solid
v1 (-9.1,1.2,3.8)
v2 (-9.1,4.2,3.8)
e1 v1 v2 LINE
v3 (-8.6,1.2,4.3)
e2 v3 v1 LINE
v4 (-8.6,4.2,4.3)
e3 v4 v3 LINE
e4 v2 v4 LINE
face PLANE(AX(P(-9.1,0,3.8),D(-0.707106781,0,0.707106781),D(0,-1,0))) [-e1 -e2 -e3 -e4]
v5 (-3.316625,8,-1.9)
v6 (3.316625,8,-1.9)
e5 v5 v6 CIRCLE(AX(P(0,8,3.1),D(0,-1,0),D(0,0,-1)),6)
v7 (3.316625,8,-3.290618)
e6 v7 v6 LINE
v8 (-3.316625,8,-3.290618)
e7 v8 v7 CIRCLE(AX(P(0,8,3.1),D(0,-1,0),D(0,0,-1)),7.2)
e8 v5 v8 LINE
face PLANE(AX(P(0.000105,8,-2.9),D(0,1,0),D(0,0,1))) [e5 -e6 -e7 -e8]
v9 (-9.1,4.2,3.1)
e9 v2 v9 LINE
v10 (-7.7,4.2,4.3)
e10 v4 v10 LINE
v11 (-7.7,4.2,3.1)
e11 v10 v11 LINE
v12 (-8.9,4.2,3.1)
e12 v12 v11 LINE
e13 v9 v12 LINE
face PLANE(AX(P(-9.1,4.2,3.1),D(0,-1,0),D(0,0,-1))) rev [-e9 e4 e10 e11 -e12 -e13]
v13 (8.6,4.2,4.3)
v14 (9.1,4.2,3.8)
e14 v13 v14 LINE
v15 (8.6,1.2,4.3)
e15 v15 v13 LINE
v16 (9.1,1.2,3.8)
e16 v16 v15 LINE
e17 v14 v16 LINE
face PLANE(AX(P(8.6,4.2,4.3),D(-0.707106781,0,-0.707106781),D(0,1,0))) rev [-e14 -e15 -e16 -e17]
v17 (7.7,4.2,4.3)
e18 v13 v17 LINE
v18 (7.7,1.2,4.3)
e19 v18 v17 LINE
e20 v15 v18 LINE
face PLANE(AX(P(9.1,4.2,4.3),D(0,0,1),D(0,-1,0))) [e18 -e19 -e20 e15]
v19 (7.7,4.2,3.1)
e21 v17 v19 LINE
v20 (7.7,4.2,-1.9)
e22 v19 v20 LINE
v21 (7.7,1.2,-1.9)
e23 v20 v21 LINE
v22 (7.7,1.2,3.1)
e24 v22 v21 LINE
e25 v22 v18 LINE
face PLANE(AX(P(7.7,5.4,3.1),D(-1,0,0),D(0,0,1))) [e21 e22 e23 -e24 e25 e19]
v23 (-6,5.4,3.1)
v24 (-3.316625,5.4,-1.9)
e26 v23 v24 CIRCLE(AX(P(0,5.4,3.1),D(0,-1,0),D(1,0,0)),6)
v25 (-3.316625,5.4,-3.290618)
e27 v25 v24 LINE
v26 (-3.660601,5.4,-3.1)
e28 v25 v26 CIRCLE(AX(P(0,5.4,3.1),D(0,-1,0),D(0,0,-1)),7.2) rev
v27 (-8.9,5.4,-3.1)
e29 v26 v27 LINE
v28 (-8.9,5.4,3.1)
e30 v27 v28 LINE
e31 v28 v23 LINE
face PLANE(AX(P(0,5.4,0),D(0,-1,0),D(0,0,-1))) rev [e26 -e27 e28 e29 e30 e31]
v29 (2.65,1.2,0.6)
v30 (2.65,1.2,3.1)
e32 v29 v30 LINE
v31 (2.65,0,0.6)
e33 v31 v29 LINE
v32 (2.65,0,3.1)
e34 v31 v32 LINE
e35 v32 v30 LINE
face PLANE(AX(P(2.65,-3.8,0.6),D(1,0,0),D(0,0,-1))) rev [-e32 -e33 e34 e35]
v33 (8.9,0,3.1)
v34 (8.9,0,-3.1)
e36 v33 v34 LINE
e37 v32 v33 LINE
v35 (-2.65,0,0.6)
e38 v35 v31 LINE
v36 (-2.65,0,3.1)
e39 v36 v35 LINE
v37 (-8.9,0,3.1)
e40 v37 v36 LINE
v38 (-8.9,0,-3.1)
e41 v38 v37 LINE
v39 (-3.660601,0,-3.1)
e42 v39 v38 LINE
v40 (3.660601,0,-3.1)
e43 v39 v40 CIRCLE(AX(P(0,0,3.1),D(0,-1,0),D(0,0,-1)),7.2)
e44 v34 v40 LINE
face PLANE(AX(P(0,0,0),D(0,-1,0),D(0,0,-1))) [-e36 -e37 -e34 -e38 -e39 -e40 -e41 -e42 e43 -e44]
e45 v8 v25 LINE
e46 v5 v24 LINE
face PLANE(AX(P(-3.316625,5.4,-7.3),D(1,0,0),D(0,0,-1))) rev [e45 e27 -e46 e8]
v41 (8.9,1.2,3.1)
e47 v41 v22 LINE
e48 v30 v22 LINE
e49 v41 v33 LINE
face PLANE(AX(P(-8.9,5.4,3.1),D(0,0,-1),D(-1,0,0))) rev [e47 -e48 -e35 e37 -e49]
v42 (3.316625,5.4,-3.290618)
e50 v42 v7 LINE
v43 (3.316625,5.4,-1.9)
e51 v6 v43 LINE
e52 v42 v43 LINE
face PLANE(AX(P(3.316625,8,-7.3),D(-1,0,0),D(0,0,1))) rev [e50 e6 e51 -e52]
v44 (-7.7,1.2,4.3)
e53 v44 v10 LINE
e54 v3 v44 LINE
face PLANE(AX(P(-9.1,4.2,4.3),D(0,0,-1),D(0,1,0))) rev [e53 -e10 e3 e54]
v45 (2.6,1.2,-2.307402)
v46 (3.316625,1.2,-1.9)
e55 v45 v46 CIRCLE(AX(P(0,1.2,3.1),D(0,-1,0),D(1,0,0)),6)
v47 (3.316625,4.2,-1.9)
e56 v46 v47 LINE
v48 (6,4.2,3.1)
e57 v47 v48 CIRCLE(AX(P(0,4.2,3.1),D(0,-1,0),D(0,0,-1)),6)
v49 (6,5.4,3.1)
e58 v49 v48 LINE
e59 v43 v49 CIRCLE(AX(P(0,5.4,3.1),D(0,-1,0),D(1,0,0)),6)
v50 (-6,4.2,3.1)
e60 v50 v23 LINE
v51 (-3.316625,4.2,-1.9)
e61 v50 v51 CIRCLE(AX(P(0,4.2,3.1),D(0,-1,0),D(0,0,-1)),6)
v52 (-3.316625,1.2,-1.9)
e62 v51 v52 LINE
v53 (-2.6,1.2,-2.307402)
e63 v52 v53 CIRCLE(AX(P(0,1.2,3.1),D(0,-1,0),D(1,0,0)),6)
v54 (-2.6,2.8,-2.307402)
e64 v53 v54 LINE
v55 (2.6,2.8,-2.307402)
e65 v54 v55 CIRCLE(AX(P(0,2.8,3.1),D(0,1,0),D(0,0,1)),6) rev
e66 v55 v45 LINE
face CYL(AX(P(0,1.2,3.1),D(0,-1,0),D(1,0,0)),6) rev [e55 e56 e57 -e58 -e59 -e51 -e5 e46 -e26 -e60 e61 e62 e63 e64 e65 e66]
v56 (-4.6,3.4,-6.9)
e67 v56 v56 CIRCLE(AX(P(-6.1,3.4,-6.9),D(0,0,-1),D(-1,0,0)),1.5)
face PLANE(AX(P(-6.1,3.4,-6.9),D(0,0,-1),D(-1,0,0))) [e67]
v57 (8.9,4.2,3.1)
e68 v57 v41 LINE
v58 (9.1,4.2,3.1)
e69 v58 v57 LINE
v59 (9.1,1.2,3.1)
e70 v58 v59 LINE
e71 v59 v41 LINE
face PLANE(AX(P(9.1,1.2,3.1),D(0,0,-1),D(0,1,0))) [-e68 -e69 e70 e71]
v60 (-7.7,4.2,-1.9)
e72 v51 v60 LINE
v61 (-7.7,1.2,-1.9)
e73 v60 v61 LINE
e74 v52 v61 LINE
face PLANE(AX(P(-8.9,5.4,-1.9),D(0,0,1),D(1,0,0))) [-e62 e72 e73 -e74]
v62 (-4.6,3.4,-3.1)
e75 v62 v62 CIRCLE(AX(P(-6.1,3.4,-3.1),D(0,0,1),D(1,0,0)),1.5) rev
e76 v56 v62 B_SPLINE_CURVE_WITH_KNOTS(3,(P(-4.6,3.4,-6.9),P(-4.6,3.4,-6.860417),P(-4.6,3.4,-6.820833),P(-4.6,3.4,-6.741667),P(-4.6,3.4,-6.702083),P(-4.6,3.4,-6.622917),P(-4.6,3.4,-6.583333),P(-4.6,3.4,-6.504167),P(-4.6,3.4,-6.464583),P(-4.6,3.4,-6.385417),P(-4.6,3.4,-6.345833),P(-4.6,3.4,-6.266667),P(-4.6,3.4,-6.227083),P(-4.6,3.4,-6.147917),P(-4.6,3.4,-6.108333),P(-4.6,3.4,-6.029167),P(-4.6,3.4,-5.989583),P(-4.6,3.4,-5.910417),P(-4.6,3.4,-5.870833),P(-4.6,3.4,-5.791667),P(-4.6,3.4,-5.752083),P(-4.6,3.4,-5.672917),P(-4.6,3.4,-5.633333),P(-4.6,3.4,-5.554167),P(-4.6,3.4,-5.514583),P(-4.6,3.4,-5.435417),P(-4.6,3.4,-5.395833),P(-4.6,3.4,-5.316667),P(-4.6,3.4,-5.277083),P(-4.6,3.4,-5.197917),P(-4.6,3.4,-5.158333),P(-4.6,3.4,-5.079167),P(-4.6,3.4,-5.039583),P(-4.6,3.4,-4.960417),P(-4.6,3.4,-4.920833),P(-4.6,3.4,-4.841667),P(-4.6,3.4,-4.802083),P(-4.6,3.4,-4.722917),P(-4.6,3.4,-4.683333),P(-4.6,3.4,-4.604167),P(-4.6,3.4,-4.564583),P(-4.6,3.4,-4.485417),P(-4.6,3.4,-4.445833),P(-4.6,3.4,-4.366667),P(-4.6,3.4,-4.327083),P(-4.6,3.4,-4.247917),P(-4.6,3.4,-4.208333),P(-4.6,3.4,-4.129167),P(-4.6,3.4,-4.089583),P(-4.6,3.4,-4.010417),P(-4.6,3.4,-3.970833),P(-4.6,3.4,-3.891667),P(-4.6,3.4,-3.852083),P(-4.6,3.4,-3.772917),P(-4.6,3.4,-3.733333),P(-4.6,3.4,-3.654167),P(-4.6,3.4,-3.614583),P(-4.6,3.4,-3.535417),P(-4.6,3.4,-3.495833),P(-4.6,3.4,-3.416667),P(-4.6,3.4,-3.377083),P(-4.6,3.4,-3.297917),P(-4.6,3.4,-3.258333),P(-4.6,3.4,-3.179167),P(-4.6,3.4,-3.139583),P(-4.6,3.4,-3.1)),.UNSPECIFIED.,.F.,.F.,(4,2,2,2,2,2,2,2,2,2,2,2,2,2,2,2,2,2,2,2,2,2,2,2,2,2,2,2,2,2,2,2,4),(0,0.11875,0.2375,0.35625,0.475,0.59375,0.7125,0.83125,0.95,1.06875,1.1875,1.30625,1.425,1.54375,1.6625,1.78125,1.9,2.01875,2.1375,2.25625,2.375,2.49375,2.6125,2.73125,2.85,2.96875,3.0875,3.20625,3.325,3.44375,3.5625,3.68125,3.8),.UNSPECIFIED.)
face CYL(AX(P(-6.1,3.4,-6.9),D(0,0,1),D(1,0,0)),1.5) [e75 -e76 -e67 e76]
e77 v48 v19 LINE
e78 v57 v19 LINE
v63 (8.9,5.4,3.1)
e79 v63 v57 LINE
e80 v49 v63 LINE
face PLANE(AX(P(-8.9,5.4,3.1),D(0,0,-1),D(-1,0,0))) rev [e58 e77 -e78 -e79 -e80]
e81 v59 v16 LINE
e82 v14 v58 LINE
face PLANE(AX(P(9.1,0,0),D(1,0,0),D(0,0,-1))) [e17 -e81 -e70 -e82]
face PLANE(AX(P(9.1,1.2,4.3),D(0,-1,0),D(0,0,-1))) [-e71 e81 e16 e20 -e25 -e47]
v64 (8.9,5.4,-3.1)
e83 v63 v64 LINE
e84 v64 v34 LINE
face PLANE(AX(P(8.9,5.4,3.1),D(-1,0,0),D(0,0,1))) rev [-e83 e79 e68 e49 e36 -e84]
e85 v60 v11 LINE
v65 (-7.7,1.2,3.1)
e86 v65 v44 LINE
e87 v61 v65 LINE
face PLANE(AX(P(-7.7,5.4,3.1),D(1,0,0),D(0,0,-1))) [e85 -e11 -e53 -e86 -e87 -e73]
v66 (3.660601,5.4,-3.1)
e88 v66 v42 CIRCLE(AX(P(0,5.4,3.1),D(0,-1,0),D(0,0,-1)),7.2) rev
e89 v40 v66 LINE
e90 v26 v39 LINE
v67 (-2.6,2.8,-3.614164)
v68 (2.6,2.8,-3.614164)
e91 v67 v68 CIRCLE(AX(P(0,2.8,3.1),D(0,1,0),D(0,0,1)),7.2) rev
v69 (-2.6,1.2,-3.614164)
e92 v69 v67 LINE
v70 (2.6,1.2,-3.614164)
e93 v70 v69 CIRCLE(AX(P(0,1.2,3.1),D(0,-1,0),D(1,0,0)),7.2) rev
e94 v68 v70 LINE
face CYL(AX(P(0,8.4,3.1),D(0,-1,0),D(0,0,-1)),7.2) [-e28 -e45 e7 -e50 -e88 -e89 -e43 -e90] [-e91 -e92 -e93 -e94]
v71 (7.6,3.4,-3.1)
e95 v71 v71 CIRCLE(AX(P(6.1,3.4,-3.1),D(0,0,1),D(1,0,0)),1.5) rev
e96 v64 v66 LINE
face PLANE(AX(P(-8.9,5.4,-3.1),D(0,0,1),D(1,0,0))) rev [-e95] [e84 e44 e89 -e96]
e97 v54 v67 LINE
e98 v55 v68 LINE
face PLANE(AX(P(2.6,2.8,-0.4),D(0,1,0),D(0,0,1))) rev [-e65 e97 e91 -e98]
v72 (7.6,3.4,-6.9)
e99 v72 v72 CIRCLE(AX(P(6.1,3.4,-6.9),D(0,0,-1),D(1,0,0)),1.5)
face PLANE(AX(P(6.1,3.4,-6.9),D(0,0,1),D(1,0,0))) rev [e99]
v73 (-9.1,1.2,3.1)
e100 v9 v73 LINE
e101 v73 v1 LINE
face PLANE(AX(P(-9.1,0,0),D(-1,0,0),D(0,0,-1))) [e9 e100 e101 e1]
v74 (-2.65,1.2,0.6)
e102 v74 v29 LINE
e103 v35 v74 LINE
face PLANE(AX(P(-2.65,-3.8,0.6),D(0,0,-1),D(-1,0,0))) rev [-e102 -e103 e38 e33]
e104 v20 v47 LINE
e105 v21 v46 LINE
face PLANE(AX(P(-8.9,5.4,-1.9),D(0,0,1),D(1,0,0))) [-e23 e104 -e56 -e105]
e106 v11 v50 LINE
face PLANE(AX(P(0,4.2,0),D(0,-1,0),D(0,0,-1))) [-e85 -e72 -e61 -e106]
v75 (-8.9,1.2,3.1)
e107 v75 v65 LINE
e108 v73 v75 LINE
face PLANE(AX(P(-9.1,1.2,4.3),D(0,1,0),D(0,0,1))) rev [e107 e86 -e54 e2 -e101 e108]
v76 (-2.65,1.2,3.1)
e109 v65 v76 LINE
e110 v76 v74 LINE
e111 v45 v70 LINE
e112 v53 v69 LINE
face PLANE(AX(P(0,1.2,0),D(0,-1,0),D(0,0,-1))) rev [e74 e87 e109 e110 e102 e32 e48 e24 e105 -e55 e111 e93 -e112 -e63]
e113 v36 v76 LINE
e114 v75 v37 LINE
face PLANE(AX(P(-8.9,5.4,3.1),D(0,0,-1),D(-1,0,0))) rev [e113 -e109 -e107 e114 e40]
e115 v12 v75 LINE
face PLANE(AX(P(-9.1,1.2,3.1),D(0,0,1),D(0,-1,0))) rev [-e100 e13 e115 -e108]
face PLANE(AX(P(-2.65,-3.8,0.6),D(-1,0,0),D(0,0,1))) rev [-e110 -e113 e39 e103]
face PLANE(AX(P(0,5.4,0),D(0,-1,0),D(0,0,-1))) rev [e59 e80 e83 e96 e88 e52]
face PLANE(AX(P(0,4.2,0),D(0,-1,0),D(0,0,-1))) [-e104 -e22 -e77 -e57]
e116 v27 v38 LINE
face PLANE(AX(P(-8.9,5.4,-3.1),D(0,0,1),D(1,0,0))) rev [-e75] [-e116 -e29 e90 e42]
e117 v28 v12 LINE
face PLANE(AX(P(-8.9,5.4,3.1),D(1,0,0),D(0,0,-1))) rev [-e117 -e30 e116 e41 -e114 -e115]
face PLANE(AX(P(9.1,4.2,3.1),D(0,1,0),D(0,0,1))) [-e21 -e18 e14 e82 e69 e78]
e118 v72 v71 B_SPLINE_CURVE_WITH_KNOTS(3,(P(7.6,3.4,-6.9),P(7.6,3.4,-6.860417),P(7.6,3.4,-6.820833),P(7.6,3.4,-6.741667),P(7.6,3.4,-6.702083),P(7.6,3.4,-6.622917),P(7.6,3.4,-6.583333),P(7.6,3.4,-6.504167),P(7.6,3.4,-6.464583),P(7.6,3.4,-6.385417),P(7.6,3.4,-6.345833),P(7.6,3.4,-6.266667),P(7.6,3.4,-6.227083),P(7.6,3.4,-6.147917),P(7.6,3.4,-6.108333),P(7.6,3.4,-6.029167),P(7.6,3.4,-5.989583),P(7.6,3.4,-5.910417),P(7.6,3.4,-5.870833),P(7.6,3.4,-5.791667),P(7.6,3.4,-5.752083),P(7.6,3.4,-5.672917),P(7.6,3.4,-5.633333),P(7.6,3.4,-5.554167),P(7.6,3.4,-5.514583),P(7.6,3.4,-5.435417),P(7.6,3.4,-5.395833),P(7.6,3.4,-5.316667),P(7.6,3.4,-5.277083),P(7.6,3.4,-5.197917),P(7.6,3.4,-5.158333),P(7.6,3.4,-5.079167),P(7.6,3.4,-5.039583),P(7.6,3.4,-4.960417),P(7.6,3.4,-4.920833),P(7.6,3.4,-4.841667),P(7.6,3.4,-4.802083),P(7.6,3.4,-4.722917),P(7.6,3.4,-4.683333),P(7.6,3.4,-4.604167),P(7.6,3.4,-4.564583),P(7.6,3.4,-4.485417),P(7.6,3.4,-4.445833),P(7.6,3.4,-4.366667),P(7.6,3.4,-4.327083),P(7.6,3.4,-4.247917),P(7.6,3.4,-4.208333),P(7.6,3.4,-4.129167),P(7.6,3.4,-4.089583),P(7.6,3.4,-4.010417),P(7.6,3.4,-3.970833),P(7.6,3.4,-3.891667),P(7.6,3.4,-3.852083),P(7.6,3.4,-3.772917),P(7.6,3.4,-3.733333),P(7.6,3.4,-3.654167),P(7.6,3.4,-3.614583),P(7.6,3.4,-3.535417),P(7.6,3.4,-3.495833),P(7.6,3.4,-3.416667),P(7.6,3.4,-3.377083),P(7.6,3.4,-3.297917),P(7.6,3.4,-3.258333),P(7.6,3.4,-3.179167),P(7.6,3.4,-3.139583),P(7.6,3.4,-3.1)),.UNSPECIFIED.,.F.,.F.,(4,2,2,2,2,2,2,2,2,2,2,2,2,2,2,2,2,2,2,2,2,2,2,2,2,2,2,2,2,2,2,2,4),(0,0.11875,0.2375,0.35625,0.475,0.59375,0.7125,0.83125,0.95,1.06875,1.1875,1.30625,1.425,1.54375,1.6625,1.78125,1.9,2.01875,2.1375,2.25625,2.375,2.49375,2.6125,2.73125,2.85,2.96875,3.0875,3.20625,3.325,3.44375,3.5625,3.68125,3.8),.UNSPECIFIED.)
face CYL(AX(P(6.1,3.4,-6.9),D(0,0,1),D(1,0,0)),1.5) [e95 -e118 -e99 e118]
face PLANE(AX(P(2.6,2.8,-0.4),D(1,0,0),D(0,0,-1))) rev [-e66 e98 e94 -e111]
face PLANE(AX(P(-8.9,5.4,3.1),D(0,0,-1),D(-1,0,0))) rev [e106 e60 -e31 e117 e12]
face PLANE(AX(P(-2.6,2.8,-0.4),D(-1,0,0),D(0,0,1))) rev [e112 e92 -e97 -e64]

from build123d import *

# Parameters (mm, degrees)
SKETCH1_W                = 17.8
SKETCH1_H                = 6.2
BOSS_EXTRUDE1_DEPTH      = 5.4
SHELL1_T                 = -1.2
SKETCH2_W                = 6
SKETCH2_H                = 4.2
REVOLVE1_DEPTH           = 8
SKETCH5_W                = 1.864108749
SKETCH5_H                = 2.6
CUT_EXTRUDE1_DEPTH       = 5.4
SKETCH6_W                = 5.2
SKETCH6_H                = 1.6
CUT_EXTRUDE2_DEPTH       = 2.7
SKETCH7_R                = 1.5
BOSS_EXTRUDE2_DEPTH      = 3.8
SKETCH8_W                = 1.2
SKETCH8_H                = 3
BOSS_EXTRUDE3_DEPTH      = 1.4
CHAMFER1_SIZE            = 0.5
CHAMFER1_OF_MIRROR1_SIZE = 0.5
SKETCH9_W                = 5.3
SKETCH9_H                = 2.5
CUT_EXTRUDE3_DEPTH       = 5


# Read off the part's stored shape, not the designer's step: Revolve1
with BuildPart() as part:
    # Sketch1 → Boss-Extrude1 (new body)
    with BuildSketch(Plane(origin=(0, 0, 0), x_dir=(1, 0, 0), z_dir=(0, 1, 0))):
        Rectangle(SKETCH1_W, SKETCH1_H)
    extrude(amount=BOSS_EXTRUDE1_DEPTH)

    # Shell1
    shell1_openings = [part.faces().sort_by_distance(p)[0] for p in [
        (0, 2.7, 3.1),
    ]]
    offset(amount=SHELL1_T, openings=shell1_openings, kind=Kind.INTERSECTION)

    # Sketch2 → Cut-Revolve1 (revolve, cut)
    with BuildSketch(Plane.XY.offset(3.1)):
        with Locations((3, 3.3)):
            Rectangle(SKETCH2_W, SKETCH2_H)
    revolve(axis=Axis((0, 1.2, 3.1), (0, 1, 0)), mode=Mode.SUBTRACT)

    # Revolve1 outline → Revolve1 (add)
    with BuildSketch(Plane(origin=(0, 0, 0), x_dir=(1, 0, 0), z_dir=(0, 1, 0))):
        with BuildLine():
            Line((-5.180733539, 1.9), (-3.31662479, 1.9))
            ThreePointArc((-3.31662479, 1.9), (0, 2.9), (3.31662479, 1.9))
            Line((3.31662479, 1.9), (5.180733539, 1.9))
            ThreePointArc((5.180733539, 1.9), (0, 4.1), (-5.180733539, 1.9))
        make_face()
    extrude(amount=REVOLVE1_DEPTH)

    # Sketch5 → Cut-Extrude1 (cut)
    with BuildSketch(Plane.XY.offset(-1.9)):
        with Locations((-4.248679165, 6.7)):
            Rectangle(SKETCH5_W, SKETCH5_H)
        with Locations((4.248679165, 6.7)):
            Rectangle(SKETCH5_W, SKETCH5_H)
    extrude(amount=-CUT_EXTRUDE1_DEPTH, mode=Mode.SUBTRACT)

    # Sketch6 → Cut-Extrude2 (cut, symmetric)
    with BuildSketch(Plane(origin=(0, 0, -3.1), x_dir=(-1, 0, 0), z_dir=(0, 0, -1))):
        with Locations((0, 2)):
            Rectangle(SKETCH6_W, SKETCH6_H)
    extrude(amount=CUT_EXTRUDE2_DEPTH, both=True, mode=Mode.SUBTRACT)

    # Sketch7 → Boss-Extrude2 (add)
    with BuildSketch(Plane(origin=(0, 0, -3.1), x_dir=(-1, 0, 0), z_dir=(0, 0, -1))):
        with Locations(Location((6.1, 3.4, 0), (0, 0, 180))):
            Circle(SKETCH7_R)
        with Locations(Location((-6.1, 3.4, 0), (0, 0, 180))):
            Circle(SKETCH7_R)
    extrude(amount=BOSS_EXTRUDE2_DEPTH)

    # Sketch8 → Boss-Extrude3 (add)
    with BuildSketch(Plane.ZY.offset(-7.7)):
        with Locations((3.7, 2.7)):
            Rectangle(SKETCH8_W, SKETCH8_H)
    boss_extrude3 = extrude(amount=-BOSS_EXTRUDE3_DEPTH)

    # Chamfer1
    chamfer1_edges = [part.edges().sort_by_distance(p)[0] for p in [
        (9.1, 2.7, 4.3),
    ]]
    chamfer(chamfer1_edges, length=CHAMFER1_SIZE)

    # Mirror1: Boss-Extrude3 across plane
    add(boss_extrude3.mirror(Plane(origin=(0, 0, 0), x_dir=(0, 0, 1), z_dir=(1, 0, 0))))

    # Chamfer1 of Mirror1
    chamfer1_of_mirror1_edges = [part.edges().sort_by_distance(p)[0] for p in [
        (-9.1, 2.7, 4.3),
    ]]
    chamfer(chamfer1_of_mirror1_edges, length=CHAMFER1_OF_MIRROR1_SIZE)

    # Sketch9 → Cut-Extrude3 (cut, symmetric)
    with BuildSketch(Plane(origin=(0, 1.2, 0), x_dir=(1, 0, 0), z_dir=(0, 1, 0))):
        with Locations((0, -1.85)):
            Rectangle(SKETCH9_W, SKETCH9_H)
    extrude(amount=CUT_EXTRUDE3_DEPTH, both=True, mode=Mode.SUBTRACT)


solid = part.part
